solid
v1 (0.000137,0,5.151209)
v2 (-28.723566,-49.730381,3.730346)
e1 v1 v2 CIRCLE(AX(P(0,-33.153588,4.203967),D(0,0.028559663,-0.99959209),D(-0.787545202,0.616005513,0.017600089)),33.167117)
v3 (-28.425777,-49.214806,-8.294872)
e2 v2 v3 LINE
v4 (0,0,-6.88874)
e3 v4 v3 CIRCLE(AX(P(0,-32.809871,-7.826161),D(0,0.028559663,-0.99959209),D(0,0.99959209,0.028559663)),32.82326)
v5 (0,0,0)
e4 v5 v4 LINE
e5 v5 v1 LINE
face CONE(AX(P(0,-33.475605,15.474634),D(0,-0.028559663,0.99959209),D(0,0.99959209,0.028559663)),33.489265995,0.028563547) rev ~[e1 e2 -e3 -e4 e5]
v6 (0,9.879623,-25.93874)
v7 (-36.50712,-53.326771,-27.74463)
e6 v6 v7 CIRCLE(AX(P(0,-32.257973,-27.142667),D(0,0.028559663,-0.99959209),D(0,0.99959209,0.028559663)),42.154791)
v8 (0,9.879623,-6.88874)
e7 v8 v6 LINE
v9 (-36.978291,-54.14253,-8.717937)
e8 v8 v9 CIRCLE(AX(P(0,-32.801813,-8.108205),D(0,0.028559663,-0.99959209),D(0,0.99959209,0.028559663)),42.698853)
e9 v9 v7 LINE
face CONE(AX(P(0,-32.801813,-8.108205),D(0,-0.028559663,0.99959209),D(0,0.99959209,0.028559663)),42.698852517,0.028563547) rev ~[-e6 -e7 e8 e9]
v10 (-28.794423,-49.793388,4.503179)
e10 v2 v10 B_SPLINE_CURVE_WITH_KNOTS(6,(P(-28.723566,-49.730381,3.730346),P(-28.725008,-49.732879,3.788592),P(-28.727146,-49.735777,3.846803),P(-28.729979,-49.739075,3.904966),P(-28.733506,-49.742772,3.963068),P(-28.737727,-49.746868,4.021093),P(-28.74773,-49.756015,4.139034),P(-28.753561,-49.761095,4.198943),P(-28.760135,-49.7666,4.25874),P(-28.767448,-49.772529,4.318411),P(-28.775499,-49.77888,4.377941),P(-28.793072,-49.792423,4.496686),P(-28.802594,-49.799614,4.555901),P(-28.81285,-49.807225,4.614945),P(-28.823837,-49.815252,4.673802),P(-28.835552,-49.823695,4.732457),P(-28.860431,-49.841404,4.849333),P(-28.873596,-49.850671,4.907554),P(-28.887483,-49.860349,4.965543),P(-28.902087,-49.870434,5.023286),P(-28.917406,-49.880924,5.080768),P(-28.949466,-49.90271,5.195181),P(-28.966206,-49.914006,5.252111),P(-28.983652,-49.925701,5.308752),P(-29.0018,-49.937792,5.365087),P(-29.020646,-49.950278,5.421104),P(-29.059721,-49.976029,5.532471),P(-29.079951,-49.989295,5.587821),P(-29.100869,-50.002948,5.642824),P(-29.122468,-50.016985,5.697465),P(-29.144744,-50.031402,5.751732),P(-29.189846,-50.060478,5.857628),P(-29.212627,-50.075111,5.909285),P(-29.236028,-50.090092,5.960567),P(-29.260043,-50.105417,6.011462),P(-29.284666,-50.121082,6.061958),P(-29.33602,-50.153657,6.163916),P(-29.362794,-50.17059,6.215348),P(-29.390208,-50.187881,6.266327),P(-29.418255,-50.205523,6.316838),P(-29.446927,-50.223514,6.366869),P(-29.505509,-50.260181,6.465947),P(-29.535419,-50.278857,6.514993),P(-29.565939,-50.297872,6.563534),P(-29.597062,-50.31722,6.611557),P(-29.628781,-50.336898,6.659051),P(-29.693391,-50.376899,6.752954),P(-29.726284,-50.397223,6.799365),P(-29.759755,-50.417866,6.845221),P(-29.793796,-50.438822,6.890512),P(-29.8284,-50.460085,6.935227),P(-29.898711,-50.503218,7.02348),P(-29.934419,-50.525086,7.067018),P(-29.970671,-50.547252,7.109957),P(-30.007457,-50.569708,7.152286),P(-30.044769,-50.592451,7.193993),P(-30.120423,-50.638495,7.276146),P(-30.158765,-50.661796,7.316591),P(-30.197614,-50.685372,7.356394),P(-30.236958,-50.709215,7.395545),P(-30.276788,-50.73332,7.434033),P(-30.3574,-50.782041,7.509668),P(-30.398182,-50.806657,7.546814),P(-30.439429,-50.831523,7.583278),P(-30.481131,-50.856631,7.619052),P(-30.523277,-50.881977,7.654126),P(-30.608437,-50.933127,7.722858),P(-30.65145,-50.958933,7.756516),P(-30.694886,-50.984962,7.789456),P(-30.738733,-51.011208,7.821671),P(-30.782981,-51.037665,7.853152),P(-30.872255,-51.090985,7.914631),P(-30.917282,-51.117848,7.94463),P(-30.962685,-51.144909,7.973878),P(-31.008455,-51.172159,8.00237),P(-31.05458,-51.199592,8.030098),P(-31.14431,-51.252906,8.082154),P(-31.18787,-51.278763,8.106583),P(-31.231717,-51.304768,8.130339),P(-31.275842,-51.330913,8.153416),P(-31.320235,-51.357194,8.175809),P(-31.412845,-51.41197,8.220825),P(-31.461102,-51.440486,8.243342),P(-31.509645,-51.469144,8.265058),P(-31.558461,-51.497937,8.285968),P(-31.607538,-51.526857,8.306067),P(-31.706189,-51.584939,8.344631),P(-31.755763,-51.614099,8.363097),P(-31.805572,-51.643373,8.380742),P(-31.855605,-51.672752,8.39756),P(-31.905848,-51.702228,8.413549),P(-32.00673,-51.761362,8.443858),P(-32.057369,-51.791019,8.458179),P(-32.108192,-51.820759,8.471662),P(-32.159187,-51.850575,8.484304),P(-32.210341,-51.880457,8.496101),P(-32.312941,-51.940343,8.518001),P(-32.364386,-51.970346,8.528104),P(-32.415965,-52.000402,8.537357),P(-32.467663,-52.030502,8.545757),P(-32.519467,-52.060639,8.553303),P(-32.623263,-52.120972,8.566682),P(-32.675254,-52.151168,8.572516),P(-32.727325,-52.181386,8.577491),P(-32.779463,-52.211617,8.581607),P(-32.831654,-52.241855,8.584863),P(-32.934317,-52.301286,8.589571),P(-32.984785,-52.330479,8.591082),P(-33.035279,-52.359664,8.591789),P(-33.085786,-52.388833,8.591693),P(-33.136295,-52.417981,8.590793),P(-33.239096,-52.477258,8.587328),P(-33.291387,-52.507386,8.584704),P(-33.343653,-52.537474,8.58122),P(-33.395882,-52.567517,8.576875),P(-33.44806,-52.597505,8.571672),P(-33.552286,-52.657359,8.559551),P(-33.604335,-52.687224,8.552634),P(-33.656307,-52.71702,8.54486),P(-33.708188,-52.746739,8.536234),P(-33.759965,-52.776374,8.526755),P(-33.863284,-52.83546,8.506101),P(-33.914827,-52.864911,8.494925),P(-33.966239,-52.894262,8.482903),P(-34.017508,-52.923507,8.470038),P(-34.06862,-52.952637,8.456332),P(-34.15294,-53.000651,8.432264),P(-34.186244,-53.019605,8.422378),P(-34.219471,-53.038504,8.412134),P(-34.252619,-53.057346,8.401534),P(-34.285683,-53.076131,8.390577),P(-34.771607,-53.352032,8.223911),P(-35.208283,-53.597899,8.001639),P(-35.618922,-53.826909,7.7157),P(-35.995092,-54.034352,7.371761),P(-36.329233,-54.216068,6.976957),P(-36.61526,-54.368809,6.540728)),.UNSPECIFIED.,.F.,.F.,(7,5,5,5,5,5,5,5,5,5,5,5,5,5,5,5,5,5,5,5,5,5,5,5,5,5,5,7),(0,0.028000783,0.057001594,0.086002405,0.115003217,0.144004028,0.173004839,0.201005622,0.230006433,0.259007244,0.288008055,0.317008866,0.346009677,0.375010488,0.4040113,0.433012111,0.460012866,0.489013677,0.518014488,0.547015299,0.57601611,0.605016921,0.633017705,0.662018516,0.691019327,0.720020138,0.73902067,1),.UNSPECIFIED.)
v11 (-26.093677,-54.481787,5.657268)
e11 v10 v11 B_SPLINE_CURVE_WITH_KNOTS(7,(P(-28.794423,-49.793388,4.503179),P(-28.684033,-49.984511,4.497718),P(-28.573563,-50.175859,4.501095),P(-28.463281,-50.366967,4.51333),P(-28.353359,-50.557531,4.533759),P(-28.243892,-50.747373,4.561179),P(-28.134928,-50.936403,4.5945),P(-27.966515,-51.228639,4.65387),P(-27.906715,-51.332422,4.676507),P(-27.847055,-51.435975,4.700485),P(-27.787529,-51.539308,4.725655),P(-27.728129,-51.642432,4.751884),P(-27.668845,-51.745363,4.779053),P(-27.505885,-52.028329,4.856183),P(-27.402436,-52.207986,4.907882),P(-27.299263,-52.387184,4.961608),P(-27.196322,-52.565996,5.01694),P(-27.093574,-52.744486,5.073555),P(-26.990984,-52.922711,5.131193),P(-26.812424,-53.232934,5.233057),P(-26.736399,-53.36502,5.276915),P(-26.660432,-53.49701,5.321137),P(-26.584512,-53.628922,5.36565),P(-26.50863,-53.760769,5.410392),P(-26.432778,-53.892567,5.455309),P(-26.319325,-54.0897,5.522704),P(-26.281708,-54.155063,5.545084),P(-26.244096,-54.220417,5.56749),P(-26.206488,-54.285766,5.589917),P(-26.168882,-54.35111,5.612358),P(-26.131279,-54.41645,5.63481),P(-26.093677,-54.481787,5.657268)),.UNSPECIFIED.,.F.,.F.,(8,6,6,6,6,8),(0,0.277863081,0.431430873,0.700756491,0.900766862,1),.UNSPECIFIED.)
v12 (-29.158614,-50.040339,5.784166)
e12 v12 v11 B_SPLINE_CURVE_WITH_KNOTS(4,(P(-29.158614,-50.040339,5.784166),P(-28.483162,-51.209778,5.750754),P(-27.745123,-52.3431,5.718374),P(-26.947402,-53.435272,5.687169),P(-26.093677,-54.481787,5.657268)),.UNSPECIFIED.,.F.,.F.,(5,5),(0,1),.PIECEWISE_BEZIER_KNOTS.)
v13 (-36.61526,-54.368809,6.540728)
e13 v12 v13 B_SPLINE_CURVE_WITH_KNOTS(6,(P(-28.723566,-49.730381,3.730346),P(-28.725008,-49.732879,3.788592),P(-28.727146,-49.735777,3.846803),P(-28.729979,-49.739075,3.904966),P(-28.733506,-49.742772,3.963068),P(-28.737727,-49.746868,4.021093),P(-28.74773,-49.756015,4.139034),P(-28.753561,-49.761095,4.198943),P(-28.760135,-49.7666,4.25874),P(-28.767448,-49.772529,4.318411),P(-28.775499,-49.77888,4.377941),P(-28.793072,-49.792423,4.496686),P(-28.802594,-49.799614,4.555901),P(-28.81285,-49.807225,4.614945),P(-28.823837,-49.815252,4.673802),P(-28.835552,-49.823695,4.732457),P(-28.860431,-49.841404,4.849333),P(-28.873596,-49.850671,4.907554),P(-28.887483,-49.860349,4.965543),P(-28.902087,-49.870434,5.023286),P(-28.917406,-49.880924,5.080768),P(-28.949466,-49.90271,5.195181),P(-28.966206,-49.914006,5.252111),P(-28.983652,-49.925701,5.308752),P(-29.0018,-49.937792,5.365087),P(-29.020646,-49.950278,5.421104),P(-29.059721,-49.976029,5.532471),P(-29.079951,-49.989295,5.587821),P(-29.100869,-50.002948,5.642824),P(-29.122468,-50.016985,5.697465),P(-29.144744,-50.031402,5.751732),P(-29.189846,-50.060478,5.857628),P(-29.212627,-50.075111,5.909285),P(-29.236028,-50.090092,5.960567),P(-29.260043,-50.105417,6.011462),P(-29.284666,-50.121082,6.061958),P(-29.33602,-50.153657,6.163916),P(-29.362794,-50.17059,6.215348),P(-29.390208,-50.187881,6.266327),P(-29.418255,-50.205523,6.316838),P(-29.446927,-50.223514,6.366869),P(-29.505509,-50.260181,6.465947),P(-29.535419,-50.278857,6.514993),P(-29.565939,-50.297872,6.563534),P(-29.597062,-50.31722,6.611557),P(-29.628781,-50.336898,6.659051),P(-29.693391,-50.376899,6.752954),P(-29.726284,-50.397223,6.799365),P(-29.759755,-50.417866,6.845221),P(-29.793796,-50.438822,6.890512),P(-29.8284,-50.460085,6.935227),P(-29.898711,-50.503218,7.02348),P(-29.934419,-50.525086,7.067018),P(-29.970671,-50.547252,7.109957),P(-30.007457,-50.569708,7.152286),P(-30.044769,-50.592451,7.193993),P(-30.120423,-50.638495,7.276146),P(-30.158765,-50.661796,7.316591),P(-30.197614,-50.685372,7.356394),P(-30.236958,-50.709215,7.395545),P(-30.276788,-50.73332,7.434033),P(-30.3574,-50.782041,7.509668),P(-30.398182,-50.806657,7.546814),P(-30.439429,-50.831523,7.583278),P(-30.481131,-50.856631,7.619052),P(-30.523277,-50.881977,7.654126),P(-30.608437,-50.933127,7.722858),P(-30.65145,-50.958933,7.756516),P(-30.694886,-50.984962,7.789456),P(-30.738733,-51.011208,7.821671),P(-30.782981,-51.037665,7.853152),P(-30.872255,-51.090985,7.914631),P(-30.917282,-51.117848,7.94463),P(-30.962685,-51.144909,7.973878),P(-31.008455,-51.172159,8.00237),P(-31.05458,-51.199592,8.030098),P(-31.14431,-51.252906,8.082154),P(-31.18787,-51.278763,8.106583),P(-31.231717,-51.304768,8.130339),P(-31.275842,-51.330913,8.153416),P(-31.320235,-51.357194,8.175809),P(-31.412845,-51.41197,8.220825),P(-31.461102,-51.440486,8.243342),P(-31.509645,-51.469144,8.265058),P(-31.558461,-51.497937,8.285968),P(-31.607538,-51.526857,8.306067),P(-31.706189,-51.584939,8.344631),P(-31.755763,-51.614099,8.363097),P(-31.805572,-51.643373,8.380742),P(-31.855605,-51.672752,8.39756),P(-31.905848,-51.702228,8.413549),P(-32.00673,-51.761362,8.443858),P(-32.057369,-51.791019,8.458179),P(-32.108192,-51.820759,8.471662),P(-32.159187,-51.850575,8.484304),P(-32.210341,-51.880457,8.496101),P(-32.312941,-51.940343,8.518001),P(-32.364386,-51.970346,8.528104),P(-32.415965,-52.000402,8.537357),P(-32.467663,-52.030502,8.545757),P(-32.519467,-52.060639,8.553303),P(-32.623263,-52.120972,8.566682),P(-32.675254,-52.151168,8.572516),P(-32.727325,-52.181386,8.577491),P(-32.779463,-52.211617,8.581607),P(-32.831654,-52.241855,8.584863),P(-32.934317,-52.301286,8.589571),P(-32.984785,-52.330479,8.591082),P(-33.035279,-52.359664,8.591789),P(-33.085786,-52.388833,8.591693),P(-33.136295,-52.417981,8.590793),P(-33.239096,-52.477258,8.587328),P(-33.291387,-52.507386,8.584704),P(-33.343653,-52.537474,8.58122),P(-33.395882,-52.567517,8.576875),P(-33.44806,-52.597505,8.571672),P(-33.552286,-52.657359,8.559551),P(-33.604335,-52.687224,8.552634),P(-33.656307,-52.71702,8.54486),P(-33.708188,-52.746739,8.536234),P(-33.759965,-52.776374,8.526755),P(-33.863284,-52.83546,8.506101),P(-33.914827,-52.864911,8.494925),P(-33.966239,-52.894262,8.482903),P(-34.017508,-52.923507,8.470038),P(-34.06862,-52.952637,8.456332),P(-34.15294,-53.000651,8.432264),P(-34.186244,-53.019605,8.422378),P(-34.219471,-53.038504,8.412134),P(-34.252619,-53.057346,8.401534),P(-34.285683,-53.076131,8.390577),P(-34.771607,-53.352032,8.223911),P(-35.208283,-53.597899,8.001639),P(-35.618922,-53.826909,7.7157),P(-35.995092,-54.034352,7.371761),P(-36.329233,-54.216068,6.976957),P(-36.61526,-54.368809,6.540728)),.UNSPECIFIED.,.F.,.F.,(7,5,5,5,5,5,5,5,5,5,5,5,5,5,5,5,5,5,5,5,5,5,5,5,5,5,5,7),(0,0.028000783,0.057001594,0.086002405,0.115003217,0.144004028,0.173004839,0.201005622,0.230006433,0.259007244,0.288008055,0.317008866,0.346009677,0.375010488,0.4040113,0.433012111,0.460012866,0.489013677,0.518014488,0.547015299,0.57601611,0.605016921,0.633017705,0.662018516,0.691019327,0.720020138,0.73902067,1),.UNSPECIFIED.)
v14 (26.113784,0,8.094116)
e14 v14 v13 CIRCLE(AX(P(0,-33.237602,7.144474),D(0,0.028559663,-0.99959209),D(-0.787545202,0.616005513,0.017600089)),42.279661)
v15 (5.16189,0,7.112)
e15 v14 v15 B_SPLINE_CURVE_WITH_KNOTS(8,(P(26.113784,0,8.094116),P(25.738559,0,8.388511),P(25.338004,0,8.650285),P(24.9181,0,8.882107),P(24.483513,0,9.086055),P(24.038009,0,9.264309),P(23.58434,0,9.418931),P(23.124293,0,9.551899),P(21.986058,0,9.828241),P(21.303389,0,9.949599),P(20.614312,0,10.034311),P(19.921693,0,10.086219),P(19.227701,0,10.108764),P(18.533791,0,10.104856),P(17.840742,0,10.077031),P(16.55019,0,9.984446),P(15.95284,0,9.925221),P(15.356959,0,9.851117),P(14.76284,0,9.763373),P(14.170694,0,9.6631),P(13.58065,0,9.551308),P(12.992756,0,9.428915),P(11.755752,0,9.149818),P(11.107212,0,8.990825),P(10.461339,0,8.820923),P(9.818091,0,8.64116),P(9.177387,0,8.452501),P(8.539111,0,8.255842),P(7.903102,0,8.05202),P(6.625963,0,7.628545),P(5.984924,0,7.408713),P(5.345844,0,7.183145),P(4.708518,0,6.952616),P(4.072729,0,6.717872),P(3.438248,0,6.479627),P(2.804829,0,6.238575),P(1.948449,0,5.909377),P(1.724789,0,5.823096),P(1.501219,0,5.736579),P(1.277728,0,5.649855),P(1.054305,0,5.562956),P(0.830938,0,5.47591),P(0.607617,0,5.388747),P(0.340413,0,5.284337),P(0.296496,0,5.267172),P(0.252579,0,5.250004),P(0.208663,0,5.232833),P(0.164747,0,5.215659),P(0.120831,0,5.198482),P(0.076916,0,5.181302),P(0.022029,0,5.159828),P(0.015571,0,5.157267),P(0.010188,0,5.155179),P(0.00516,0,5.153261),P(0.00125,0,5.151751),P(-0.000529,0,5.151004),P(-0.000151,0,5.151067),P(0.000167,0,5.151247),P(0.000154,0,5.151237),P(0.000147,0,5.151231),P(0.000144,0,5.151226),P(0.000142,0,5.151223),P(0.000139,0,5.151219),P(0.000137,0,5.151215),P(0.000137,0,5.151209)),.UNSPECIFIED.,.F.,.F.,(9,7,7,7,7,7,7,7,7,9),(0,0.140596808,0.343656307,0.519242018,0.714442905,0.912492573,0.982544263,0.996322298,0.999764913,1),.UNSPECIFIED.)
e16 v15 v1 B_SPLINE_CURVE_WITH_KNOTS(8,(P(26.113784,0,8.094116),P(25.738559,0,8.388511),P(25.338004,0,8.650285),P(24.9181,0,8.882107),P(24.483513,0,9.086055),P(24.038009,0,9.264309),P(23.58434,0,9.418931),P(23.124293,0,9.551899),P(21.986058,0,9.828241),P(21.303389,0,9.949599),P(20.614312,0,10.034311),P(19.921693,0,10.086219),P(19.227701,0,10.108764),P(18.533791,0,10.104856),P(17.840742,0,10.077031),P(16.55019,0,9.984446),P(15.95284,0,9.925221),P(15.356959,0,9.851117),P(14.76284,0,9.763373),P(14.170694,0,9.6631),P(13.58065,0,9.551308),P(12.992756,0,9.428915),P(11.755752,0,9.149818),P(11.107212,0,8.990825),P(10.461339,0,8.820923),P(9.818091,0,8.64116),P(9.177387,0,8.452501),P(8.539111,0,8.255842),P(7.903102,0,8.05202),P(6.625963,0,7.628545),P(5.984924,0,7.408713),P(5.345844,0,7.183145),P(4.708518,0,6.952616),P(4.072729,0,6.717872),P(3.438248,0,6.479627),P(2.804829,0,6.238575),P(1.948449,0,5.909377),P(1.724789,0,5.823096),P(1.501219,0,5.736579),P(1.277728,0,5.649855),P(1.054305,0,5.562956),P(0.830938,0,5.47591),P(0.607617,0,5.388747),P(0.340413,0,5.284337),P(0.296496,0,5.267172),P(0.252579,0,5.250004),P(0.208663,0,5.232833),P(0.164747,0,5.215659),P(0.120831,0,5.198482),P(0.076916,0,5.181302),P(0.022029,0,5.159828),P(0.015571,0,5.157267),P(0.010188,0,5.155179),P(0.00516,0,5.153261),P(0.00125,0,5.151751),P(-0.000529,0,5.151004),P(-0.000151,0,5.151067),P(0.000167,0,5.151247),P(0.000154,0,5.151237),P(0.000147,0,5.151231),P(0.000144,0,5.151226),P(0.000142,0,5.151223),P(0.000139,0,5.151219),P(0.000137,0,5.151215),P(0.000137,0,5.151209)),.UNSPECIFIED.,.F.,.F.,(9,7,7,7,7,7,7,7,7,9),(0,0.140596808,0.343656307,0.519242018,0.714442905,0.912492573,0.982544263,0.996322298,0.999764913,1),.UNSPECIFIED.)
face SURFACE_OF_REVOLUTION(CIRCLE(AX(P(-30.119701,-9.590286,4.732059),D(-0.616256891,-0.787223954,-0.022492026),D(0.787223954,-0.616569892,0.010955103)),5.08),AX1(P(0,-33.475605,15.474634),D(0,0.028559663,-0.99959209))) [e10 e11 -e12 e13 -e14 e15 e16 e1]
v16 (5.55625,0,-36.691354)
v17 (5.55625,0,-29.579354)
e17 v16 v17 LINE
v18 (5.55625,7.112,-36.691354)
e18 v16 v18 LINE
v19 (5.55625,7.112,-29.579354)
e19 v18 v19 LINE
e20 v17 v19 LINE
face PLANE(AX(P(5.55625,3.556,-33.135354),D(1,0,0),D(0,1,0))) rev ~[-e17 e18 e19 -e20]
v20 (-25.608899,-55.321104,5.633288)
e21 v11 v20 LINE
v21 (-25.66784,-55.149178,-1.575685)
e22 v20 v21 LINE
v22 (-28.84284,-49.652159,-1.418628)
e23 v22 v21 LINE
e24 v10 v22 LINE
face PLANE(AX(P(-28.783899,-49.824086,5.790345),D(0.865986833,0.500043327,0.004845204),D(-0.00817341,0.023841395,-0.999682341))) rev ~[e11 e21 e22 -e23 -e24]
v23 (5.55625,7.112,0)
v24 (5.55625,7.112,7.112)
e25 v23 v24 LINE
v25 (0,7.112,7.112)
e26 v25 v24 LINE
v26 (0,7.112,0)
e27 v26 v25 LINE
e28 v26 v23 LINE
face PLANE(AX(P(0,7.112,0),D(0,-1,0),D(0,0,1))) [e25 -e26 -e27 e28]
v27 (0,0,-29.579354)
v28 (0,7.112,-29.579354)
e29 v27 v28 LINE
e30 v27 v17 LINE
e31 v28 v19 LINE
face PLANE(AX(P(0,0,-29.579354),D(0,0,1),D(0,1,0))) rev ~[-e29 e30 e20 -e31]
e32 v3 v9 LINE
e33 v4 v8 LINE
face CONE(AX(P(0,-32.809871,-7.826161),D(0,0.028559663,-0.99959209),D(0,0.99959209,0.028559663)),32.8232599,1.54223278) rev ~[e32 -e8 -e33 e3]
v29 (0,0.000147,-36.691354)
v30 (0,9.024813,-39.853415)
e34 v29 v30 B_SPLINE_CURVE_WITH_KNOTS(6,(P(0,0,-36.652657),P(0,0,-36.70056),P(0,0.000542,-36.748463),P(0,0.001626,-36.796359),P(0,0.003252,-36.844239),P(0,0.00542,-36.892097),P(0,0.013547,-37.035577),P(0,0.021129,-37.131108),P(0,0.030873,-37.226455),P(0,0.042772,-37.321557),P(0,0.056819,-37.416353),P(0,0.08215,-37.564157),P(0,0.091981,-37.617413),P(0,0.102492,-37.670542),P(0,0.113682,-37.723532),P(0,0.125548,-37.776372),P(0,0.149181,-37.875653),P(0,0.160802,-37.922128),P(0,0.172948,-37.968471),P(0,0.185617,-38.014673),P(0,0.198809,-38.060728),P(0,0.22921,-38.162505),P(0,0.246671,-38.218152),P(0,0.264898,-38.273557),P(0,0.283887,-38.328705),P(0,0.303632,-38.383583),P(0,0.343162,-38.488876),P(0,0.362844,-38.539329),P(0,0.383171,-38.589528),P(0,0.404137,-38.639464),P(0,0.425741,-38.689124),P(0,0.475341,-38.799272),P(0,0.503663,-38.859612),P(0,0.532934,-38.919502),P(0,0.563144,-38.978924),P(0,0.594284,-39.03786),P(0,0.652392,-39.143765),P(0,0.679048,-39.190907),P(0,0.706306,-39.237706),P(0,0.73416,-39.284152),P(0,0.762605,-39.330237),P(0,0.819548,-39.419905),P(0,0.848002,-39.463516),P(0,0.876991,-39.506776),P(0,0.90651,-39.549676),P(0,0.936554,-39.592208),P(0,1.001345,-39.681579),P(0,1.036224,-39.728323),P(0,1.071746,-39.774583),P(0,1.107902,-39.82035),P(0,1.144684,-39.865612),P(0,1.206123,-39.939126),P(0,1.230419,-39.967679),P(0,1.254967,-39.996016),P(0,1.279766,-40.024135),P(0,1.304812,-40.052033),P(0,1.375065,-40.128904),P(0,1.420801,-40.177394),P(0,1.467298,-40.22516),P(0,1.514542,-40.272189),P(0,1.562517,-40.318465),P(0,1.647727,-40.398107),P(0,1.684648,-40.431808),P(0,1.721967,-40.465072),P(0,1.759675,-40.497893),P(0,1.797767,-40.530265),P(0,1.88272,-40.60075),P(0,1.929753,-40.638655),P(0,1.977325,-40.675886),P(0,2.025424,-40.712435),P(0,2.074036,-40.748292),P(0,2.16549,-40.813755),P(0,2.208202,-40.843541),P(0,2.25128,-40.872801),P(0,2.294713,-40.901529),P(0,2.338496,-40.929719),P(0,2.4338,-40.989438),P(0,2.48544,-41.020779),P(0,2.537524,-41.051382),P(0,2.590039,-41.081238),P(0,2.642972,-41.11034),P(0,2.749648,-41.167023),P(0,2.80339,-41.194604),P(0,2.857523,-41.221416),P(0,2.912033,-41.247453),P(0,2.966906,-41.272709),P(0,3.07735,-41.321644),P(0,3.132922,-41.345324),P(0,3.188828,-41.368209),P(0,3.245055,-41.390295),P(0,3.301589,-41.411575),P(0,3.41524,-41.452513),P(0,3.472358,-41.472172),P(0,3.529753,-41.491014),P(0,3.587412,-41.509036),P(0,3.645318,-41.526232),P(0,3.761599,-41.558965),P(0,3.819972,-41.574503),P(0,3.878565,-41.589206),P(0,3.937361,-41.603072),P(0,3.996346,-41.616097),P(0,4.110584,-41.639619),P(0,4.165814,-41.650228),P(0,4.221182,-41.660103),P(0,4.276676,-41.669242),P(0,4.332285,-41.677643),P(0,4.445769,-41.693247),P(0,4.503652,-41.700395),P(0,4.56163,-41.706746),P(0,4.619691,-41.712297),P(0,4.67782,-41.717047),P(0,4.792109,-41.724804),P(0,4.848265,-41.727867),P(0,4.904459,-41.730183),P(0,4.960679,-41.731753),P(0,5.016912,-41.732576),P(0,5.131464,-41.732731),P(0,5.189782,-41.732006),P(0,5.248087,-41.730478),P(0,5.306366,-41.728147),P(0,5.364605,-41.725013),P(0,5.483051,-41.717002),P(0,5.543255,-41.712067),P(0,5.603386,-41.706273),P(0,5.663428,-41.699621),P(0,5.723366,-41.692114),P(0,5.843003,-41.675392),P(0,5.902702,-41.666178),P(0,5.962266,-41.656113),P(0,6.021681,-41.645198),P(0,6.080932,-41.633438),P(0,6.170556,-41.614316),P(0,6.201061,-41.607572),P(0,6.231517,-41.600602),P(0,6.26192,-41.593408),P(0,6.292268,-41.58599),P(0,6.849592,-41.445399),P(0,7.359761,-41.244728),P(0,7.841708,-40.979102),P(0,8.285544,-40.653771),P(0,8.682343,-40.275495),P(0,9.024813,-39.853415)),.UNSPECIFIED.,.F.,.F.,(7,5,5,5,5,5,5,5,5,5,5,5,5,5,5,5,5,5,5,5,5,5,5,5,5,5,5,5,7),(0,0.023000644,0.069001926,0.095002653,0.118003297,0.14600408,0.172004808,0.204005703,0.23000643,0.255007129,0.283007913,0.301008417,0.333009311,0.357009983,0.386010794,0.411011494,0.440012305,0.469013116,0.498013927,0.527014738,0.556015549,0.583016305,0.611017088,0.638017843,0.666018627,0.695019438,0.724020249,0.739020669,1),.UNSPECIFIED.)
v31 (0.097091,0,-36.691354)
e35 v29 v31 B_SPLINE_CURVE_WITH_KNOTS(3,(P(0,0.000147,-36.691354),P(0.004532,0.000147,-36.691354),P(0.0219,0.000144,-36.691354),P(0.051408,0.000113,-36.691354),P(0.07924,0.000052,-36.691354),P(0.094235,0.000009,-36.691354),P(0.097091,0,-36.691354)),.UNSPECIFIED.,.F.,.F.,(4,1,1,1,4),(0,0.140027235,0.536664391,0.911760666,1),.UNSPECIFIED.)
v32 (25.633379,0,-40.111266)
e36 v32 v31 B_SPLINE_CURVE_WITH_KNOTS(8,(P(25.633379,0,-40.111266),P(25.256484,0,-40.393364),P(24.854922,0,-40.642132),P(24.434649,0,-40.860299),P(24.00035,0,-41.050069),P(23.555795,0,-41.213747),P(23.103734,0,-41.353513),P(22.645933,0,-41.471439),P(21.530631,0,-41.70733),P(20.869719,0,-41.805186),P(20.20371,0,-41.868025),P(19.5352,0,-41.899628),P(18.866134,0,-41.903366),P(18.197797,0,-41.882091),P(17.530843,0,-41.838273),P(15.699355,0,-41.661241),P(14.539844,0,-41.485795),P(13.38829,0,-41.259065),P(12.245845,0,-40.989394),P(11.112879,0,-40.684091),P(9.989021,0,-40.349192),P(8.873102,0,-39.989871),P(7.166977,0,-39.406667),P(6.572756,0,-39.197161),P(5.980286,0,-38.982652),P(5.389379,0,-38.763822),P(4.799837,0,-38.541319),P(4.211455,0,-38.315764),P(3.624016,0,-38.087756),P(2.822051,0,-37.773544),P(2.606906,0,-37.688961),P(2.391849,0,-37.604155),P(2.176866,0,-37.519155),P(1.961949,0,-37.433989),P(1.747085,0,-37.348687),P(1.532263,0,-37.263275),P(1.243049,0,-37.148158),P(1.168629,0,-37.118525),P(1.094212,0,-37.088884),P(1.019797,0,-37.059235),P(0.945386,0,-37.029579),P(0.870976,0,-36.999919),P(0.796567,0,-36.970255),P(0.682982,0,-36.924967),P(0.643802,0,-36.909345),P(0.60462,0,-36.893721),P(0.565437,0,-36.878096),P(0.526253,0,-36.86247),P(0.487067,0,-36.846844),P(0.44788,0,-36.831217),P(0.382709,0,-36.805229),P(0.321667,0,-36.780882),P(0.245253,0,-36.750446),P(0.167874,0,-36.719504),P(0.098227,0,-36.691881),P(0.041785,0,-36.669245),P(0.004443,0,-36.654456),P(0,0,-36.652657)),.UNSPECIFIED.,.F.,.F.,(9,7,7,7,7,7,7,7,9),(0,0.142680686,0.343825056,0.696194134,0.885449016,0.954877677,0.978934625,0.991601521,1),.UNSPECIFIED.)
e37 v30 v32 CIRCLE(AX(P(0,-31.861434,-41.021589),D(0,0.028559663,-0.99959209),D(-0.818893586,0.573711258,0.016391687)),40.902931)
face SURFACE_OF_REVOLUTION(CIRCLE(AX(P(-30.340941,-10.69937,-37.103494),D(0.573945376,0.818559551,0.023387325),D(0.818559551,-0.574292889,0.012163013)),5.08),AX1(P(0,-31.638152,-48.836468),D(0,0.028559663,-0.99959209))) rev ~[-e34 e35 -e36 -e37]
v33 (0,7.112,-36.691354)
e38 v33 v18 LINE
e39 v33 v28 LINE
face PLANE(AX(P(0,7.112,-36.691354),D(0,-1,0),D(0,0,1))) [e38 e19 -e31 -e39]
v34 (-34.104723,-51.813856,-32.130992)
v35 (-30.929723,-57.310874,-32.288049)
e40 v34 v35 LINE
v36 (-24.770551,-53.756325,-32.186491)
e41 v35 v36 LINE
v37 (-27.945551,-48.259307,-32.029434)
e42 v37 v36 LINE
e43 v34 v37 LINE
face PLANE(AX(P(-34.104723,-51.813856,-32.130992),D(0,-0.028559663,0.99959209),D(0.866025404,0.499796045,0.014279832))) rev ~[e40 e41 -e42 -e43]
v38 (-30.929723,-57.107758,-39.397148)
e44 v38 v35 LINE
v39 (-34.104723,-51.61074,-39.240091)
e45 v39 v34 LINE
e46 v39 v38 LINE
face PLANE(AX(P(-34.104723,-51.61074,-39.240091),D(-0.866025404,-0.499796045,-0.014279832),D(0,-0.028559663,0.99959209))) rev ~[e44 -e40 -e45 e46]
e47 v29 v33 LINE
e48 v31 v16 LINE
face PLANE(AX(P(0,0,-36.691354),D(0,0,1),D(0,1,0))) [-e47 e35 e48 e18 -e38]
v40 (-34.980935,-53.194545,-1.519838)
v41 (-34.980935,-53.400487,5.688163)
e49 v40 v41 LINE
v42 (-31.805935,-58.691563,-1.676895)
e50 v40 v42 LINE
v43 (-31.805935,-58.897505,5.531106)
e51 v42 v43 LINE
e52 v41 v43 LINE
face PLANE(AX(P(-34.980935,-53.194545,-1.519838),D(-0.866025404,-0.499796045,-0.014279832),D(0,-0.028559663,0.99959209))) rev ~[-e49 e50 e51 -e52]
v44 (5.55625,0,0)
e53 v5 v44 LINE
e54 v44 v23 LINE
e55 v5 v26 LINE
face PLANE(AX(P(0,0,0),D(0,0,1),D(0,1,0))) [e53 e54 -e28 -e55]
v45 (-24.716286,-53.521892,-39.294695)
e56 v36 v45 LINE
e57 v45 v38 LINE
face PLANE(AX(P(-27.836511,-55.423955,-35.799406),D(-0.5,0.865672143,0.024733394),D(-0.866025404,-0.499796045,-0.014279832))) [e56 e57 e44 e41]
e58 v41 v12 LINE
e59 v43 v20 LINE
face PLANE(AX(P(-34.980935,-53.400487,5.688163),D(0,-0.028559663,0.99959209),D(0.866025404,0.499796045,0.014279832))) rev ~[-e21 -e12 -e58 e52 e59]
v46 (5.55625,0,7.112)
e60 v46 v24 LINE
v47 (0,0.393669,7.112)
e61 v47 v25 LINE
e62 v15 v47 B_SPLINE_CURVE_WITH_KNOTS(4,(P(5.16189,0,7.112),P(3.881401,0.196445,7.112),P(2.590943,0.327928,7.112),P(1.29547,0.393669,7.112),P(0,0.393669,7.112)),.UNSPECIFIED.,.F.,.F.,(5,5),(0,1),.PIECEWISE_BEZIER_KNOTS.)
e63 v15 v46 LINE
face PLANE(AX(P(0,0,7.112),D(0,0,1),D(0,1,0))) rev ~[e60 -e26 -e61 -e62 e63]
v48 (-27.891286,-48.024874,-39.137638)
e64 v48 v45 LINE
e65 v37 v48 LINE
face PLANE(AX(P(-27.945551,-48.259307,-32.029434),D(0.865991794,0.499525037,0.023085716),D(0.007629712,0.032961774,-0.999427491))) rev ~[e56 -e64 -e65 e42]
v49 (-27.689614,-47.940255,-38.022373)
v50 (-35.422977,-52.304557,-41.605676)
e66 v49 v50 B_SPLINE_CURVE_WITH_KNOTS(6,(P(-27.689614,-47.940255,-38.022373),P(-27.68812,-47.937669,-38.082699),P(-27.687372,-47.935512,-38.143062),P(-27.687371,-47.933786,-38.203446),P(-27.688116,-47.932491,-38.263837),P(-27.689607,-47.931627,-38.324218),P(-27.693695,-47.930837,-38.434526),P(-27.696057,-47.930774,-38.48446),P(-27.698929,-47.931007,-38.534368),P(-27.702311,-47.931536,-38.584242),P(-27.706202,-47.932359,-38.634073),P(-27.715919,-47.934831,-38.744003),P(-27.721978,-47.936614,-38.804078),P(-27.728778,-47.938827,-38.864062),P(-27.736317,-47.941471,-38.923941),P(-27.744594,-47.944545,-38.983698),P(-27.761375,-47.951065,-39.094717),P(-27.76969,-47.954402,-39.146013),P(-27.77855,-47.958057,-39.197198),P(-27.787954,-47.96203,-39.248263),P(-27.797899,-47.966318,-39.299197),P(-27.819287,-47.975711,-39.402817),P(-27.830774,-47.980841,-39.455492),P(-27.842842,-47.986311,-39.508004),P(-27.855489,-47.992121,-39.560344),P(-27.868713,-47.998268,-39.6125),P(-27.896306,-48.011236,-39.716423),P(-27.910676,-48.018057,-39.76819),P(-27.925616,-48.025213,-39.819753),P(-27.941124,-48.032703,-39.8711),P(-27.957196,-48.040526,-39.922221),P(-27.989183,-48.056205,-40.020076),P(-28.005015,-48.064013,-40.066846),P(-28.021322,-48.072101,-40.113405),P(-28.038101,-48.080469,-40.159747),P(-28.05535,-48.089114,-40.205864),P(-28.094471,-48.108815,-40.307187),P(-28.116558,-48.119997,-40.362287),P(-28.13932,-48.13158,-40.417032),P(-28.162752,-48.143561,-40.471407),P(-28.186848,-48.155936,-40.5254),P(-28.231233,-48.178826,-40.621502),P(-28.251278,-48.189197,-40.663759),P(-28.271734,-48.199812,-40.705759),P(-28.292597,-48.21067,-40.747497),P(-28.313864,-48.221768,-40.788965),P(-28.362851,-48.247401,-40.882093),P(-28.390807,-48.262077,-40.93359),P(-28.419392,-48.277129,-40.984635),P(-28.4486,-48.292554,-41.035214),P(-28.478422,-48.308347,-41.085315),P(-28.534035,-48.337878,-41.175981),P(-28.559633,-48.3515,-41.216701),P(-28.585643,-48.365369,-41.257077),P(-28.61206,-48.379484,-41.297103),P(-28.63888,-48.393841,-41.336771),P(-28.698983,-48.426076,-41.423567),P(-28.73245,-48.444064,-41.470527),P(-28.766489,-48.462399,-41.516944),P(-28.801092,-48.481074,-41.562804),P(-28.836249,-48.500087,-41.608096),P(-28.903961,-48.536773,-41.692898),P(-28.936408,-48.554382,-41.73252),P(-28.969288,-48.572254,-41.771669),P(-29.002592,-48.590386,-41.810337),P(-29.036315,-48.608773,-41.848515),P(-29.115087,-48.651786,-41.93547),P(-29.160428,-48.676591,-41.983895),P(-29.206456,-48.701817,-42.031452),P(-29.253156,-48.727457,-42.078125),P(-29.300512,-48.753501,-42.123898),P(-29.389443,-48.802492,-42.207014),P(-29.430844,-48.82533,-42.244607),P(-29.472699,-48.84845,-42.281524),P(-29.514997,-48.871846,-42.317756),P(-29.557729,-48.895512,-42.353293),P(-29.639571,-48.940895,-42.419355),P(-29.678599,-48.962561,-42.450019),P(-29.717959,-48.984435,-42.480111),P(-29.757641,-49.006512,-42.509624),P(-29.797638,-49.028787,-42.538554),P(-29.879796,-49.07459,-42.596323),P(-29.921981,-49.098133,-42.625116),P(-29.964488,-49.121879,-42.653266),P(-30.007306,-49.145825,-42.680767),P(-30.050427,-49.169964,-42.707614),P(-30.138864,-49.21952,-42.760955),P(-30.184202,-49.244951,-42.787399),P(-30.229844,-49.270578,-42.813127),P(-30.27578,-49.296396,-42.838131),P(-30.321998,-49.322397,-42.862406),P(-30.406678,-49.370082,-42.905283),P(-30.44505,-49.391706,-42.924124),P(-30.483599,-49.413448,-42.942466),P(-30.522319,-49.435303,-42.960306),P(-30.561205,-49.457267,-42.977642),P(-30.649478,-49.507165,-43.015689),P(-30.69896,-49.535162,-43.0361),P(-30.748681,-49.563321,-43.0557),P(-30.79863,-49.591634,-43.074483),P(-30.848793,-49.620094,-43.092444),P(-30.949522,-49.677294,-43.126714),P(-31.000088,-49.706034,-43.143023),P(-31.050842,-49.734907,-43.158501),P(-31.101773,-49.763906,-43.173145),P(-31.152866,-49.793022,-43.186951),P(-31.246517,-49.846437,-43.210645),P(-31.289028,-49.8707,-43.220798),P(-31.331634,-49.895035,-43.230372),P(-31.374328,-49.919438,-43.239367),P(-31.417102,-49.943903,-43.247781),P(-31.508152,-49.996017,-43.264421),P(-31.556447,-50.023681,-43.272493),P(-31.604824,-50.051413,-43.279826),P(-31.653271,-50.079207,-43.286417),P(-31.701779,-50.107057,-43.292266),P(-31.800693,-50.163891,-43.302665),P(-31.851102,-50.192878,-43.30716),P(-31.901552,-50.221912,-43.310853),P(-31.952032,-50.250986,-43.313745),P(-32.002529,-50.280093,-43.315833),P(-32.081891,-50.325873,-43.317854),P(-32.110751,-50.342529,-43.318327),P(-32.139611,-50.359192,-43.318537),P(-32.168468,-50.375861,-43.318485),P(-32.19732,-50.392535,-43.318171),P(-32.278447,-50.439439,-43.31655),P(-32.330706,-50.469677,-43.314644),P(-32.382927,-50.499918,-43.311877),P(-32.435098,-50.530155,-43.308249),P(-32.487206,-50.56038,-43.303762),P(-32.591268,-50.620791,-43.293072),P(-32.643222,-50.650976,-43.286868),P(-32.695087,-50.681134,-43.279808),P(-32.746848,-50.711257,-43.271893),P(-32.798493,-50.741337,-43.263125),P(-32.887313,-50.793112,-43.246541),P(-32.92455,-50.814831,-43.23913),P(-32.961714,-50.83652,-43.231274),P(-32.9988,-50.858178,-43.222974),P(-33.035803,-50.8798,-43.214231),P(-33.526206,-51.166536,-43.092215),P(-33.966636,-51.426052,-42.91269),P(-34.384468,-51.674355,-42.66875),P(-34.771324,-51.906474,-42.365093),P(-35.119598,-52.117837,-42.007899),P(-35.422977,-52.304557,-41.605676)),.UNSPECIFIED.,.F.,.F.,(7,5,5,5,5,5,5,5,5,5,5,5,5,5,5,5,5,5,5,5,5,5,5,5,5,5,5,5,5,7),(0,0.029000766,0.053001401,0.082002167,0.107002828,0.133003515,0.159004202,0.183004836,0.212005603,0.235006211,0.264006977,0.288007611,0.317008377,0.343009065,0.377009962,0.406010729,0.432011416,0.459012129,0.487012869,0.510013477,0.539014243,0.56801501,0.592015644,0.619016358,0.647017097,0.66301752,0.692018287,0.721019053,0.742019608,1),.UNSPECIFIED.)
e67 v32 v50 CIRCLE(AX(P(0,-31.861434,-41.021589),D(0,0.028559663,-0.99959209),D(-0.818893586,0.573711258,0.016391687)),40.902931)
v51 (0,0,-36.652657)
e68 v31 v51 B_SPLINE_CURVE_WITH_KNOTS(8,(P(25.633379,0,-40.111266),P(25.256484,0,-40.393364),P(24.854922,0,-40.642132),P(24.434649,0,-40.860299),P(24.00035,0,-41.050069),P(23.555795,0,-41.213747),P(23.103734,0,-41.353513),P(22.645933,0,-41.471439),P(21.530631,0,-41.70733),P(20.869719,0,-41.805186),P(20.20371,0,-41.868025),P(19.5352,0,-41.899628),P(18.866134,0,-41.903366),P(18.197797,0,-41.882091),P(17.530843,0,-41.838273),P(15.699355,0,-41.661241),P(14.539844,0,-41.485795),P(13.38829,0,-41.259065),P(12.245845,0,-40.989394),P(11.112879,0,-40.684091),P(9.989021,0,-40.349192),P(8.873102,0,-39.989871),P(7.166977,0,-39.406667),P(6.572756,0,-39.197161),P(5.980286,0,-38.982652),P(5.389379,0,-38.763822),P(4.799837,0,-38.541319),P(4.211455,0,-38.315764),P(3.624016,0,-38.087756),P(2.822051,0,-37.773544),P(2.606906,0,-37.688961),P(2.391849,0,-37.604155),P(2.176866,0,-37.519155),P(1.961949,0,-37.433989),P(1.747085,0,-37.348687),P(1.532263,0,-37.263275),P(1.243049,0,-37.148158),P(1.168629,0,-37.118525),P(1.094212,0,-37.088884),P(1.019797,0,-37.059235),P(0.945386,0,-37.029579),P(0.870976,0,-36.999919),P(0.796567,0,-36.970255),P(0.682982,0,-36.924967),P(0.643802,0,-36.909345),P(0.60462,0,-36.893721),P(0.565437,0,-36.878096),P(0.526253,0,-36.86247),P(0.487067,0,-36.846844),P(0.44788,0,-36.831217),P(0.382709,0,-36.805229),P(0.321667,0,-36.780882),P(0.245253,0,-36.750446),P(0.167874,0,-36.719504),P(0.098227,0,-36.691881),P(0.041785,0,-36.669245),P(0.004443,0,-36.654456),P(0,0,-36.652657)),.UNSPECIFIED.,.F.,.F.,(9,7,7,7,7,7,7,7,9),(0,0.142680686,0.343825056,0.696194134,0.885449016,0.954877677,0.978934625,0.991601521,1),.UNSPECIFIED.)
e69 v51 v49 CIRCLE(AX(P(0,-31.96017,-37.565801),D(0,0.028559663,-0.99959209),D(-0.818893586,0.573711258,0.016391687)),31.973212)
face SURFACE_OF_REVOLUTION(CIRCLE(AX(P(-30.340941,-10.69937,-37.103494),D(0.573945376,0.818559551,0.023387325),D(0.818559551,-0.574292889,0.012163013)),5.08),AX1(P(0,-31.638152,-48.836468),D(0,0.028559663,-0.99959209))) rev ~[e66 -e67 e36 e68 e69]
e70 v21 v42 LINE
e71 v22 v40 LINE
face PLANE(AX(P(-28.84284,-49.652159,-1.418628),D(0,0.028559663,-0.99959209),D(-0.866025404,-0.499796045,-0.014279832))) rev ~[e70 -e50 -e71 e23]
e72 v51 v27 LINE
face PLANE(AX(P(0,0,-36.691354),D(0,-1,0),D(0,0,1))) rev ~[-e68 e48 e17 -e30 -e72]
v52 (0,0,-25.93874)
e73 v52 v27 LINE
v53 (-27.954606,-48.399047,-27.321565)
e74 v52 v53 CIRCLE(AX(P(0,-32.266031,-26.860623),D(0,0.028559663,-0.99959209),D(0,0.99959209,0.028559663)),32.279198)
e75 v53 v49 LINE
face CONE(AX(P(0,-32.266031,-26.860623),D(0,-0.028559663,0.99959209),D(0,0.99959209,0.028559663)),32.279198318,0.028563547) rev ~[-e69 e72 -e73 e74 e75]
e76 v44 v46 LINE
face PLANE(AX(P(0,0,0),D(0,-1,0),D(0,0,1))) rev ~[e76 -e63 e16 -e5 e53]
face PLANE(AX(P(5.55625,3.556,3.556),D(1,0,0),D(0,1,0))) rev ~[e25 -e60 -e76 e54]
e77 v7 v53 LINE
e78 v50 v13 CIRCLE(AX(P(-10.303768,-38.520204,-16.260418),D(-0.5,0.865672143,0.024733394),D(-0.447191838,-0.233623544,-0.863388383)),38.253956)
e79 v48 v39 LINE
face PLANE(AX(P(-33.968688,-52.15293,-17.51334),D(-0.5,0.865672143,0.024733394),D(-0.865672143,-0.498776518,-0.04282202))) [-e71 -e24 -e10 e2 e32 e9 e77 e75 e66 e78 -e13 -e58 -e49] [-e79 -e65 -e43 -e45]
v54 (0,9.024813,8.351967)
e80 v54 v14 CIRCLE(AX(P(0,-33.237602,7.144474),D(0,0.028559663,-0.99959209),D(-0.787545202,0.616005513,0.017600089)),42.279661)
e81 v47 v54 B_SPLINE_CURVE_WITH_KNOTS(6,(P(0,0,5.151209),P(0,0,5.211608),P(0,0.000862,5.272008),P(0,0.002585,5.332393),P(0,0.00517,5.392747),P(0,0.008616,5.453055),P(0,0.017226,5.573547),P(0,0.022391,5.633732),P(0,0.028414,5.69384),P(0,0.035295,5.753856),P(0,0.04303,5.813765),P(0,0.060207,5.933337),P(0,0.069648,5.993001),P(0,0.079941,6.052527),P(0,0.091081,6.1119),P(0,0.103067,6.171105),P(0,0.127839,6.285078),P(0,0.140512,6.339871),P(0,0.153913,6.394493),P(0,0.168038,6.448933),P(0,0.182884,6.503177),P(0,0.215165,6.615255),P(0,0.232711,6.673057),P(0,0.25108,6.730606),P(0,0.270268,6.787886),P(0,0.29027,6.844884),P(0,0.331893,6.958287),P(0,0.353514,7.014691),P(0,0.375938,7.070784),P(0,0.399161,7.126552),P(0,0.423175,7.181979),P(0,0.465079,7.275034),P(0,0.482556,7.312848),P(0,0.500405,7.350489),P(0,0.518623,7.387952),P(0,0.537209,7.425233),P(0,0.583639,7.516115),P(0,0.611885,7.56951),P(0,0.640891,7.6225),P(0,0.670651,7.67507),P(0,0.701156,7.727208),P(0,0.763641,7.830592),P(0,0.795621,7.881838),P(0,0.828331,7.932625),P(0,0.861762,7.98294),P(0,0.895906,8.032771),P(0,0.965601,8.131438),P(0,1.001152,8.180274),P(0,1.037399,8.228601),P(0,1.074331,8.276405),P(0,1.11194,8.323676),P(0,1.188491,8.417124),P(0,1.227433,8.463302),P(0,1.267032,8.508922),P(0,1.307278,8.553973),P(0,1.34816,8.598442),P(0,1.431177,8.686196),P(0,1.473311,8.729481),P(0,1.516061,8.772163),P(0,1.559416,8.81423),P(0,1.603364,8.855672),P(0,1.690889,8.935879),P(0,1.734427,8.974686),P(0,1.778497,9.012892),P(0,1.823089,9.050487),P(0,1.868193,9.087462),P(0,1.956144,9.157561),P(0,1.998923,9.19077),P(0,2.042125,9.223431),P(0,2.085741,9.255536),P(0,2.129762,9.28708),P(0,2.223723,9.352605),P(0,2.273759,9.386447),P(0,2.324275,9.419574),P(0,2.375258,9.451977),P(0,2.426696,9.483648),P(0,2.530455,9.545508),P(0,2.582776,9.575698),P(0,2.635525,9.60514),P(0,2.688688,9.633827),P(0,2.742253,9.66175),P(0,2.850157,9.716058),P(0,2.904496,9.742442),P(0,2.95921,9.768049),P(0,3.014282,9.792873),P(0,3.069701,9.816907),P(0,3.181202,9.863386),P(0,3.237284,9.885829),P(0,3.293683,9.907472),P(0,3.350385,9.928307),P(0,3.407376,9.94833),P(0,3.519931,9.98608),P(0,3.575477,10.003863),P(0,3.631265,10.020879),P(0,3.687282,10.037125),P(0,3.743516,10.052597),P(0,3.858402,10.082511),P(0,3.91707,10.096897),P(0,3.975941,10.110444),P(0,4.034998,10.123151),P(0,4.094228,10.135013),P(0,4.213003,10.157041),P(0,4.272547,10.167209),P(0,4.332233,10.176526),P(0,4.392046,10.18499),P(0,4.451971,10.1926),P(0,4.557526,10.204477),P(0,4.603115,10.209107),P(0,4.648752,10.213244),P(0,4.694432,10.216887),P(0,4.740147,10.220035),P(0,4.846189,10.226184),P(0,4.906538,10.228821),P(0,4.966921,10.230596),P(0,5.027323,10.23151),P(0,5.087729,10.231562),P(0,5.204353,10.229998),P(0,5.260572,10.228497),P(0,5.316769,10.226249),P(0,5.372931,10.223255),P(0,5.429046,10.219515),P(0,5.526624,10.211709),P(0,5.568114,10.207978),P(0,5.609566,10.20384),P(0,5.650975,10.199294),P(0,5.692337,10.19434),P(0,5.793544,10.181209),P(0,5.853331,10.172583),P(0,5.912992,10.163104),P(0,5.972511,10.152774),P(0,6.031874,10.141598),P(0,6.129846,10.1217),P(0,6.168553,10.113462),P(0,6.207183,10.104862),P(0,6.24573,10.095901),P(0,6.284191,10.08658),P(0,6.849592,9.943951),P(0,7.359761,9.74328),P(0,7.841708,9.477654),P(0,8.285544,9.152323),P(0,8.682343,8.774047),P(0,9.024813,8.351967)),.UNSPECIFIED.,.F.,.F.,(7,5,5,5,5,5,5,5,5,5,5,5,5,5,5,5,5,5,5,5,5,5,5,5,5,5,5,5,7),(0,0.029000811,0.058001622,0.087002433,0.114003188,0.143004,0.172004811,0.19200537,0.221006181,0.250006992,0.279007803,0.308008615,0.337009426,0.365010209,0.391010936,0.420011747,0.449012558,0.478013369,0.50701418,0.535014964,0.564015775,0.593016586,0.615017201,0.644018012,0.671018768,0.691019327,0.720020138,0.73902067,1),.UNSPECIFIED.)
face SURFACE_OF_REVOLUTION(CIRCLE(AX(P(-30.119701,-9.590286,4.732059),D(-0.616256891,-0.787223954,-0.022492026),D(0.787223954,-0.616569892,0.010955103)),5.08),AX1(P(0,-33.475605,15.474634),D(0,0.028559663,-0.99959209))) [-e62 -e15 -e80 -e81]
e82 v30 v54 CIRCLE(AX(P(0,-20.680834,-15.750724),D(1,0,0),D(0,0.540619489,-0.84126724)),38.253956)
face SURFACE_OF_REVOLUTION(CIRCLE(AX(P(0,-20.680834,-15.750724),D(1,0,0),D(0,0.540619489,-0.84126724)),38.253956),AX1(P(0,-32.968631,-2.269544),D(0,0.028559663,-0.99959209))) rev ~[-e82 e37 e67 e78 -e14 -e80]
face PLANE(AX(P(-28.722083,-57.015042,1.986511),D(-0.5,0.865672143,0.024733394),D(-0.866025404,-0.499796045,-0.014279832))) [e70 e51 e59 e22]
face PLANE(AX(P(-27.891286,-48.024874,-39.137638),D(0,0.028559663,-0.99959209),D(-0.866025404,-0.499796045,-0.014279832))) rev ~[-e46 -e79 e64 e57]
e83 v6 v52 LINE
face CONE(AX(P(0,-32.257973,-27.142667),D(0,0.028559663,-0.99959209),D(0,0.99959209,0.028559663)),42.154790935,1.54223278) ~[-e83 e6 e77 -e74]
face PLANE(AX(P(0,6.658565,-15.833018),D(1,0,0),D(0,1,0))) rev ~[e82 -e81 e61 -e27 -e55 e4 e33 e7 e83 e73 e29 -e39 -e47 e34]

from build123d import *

# Parameters (mm, degrees)
F2_ANGLE    = 240
F3_W        = 7.112
F3_H        = 7.112
F4_DEPTH    = 5.55625
F5_W        = 7.112
F5_H        = 7.112
F6_DEPTH    = 5.55625
F7_T4_ANGLE = 349.948380696
F7_T9_ANGLE = 349.948380696
F8_T4_ANGLE = 343.9133898586
F8_T9_ANGLE = 343.9133898586
F11_DEPTH   = 6.35
F13_DEPTH   = 6.35


# Not quite as in the source:
# - a fillet or chamfer that OpenCascade refuses, or shapes differently, is made with other operations: its cross-section is extruded or revolved along the edge and cut away or added


with BuildPart() as f2:
    # F0 (on Right) → F2 (revolve)
    with BuildSketch(Plane.YZ):
        with BuildLine():
            Line((0, -25.9387402122), (0, -47.9325240122))
            ThreePointArc((0, -47.9325240122), (17.5731218804, -15.7507240122), (0, 16.4310759878))
            Line((0, 16.4310759878), (0, -6.8887402122))
            Line((0, -6.8887402122), (9.8796226174, -6.8887402122))
            Line((9.8796226174, -6.8887402122), (9.8796226174, -25.9387402122))
            Line((9.8796226174, -25.9387402122), (0, -25.9387402122))
        make_face()
    revolve(axis=Axis((0, -32.9686308407, -2.2695437855), (0, 0.0285596631, -0.9995920896)), revolution_arc=F2_ANGLE)

    # F3 (on Right) → F4 (cut)
    with BuildSketch(Plane.YZ):
        with Locations((3.556, 3.556)):
            Rectangle(F3_W, F3_H)
    extrude(amount=F4_DEPTH, mode=Mode.SUBTRACT)

    # F5 (on Right) → F6 (cut)
    with BuildSketch(Plane.YZ):
        with Locations((3.556, -33.1353539076)):
            Rectangle(F5_W, F5_H)
    extrude(amount=F6_DEPTH, mode=Mode.SUBTRACT)

    # F7: fillet of radius 5.08 on 1 edges, made by hand


with BuildPart() as f7_tool2:
    # F7_s3 → F7_t4 (revolve)
    with BuildSketch(Plane(origin=(-15.519406183, -22.1337407382, -0.6323901361), x_dir=(0.8187835052, -0.5741024052, 0), z_dir=(-0.5739453762, -0.8185595508, -0.0233873249))):
        with BuildLine():
            ThreePointArc((-13.6205038164, -36.4192771202), (-16.9439528127, -41.2478681872), (-22.6057068813, -39.7295975294))
            ThreePointArc((-22.6057068813, -39.7295975294), (-18.3618922347, -44.077312283), (-13.4832691044, -47.6983097543))
            Line((-13.4832691044, -47.6983097543), (-13.6205038164, -36.4192771202))
        make_face()
    revolve(axis=Axis((0, -31.638152468, -48.8364677143), (0, 0.0285596631, -0.9995920896)), revolution_arc=F7_T4_ANGLE)

    split(bisect_by=Plane.XZ, keep=Keep.TOP)


with BuildPart() as f2_1:
    add(f2.part)

    # F7_t1: cut F7_tool2
    add(f7_tool2.part, mode=Mode.SUBTRACT)


with BuildPart() as f7_tool7:
    # F7_s8 → F7_t9 (revolve)
    with BuildSketch(Plane(origin=(-15.519406183, -22.1337407382, -0.6323901361), x_dir=(0.8187835052, -0.5741024052, 0), z_dir=(-0.5739453762, -0.8185595508, -0.0233873249))):
        with BuildLine():
            ThreePointArc((-13.6205038164, -36.4192771202), (-16.9439528127, -41.2478681872), (-22.6057068813, -39.7295975294))
            ThreePointArc((-22.6057068813, -39.7295975294), (-18.3618922347, -44.077312283), (-13.4832691044, -47.6983097543))
            Line((-13.4832691044, -47.6983097543), (-13.6205038164, -36.4192771202))
        make_face()
    revolve(axis=Axis((0, -31.638152468, -48.8364677143), (0, 0.0285596631, -0.9995920896)), revolution_arc=F7_T9_ANGLE)

    split(bisect_by=Plane.XZ, keep=Keep.BOTTOM)


with BuildPart() as f2_2:
    add(f2_1.part)

    # F7_t6: cut F7_tool7
    add(f7_tool7.part, mode=Mode.SUBTRACT)

    # F8: fillet of radius 5.08 on 1 edges, made by hand


with BuildPart() as f8_tool2:
    # F8_s3 → F8_t4 (revolve)
    with BuildSketch(Plane(origin=(-16.0256017919, -20.4715562588, -0.5848993354), x_dir=(0.7874231543, -0.6164128292, 0), z_dir=(-0.6162568906, -0.7872239539, -0.0224920256))):
        with BuildLine():
            ThreePointArc((-12.7256800931, 5.3739698626), (-16.1598904571, 10.124422904), (-21.7850242933, 8.4756432802))
            ThreePointArc((-21.7850242933, 8.4756432802), (-17.6428750877, 12.9203239541), (-12.8492834764, 16.6531601142))
            Line((-12.8492834764, 16.6531601142), (-12.7256800931, 5.3739698626))
        make_face()
    revolve(axis=Axis((0, -33.4756053748, 15.4746338351), (0, 0.0285596631, -0.9995920896)), revolution_arc=F8_T4_ANGLE)

    split(bisect_by=Plane.XZ, keep=Keep.TOP)


with BuildPart() as f2_3:
    add(f2_2.part)

    # F8_t1: cut F8_tool2
    add(f8_tool2.part, mode=Mode.SUBTRACT)


with BuildPart() as f8_tool7:
    # F8_s8 → F8_t9 (revolve)
    with BuildSketch(Plane(origin=(-16.0256017919, -20.4715562588, -0.5848993354), x_dir=(0.7874231543, -0.6164128292, 0), z_dir=(-0.6162568906, -0.7872239539, -0.0224920256))):
        with BuildLine():
            ThreePointArc((-12.7256800931, 5.3739698626), (-16.1598904571, 10.124422904), (-21.7850242933, 8.4756432802))
            ThreePointArc((-21.7850242933, 8.4756432802), (-17.6428750877, 12.9203239541), (-12.8492834764, 16.6531601142))
            Line((-12.8492834764, 16.6531601142), (-12.7256800931, 5.3739698626))
        make_face()
    revolve(axis=Axis((0, -33.4756053748, 15.4746338351), (0, 0.0285596631, -0.9995920896)), revolution_arc=F8_T9_ANGLE)

    split(bisect_by=Plane.XZ, keep=Keep.BOTTOM)


with BuildPart() as f2_4:
    add(f2_3.part)

    # F8_t6: cut F8_tool7
    add(f8_tool7.part, mode=Mode.SUBTRACT)

    # F10 (on offset) → F11 (cut)
    with BuildSketch(Plane(origin=(14.2980794165, -24.7548980996, -0.7072800555), x_dir=(-0.8660254038, -0.4997960448, -0.0142798315), z_dir=(-0.5, 0.865672143, 0.0247333937))):
        Polygon((49.7467838827, 7.2109422366), (49.8148426414, 0), (56.9025047774, 0), (56.9025047774, 7.2109422366), align=None)
    extrude(amount=-F11_DEPTH, mode=Mode.SUBTRACT)

    # F12 (on offset) → F13 (cut)
    with BuildSketch(Plane(origin=(14.2980794165, -24.7548980996, -0.7072800555), x_dir=(-0.8660254038, -0.4997960448, -0.0142798315), z_dir=(-0.5, 0.865672143, 0.0247333937))):
        Polygon((55.8907425518, -30.6380988543), (48.7787425518, -30.6380988543), (48.716083169, -37.7500988543), (55.8907425518, -37.7500988543), align=None)
    extrude(amount=-F13_DEPTH, mode=Mode.SUBTRACT)


solid = f2_4.part
